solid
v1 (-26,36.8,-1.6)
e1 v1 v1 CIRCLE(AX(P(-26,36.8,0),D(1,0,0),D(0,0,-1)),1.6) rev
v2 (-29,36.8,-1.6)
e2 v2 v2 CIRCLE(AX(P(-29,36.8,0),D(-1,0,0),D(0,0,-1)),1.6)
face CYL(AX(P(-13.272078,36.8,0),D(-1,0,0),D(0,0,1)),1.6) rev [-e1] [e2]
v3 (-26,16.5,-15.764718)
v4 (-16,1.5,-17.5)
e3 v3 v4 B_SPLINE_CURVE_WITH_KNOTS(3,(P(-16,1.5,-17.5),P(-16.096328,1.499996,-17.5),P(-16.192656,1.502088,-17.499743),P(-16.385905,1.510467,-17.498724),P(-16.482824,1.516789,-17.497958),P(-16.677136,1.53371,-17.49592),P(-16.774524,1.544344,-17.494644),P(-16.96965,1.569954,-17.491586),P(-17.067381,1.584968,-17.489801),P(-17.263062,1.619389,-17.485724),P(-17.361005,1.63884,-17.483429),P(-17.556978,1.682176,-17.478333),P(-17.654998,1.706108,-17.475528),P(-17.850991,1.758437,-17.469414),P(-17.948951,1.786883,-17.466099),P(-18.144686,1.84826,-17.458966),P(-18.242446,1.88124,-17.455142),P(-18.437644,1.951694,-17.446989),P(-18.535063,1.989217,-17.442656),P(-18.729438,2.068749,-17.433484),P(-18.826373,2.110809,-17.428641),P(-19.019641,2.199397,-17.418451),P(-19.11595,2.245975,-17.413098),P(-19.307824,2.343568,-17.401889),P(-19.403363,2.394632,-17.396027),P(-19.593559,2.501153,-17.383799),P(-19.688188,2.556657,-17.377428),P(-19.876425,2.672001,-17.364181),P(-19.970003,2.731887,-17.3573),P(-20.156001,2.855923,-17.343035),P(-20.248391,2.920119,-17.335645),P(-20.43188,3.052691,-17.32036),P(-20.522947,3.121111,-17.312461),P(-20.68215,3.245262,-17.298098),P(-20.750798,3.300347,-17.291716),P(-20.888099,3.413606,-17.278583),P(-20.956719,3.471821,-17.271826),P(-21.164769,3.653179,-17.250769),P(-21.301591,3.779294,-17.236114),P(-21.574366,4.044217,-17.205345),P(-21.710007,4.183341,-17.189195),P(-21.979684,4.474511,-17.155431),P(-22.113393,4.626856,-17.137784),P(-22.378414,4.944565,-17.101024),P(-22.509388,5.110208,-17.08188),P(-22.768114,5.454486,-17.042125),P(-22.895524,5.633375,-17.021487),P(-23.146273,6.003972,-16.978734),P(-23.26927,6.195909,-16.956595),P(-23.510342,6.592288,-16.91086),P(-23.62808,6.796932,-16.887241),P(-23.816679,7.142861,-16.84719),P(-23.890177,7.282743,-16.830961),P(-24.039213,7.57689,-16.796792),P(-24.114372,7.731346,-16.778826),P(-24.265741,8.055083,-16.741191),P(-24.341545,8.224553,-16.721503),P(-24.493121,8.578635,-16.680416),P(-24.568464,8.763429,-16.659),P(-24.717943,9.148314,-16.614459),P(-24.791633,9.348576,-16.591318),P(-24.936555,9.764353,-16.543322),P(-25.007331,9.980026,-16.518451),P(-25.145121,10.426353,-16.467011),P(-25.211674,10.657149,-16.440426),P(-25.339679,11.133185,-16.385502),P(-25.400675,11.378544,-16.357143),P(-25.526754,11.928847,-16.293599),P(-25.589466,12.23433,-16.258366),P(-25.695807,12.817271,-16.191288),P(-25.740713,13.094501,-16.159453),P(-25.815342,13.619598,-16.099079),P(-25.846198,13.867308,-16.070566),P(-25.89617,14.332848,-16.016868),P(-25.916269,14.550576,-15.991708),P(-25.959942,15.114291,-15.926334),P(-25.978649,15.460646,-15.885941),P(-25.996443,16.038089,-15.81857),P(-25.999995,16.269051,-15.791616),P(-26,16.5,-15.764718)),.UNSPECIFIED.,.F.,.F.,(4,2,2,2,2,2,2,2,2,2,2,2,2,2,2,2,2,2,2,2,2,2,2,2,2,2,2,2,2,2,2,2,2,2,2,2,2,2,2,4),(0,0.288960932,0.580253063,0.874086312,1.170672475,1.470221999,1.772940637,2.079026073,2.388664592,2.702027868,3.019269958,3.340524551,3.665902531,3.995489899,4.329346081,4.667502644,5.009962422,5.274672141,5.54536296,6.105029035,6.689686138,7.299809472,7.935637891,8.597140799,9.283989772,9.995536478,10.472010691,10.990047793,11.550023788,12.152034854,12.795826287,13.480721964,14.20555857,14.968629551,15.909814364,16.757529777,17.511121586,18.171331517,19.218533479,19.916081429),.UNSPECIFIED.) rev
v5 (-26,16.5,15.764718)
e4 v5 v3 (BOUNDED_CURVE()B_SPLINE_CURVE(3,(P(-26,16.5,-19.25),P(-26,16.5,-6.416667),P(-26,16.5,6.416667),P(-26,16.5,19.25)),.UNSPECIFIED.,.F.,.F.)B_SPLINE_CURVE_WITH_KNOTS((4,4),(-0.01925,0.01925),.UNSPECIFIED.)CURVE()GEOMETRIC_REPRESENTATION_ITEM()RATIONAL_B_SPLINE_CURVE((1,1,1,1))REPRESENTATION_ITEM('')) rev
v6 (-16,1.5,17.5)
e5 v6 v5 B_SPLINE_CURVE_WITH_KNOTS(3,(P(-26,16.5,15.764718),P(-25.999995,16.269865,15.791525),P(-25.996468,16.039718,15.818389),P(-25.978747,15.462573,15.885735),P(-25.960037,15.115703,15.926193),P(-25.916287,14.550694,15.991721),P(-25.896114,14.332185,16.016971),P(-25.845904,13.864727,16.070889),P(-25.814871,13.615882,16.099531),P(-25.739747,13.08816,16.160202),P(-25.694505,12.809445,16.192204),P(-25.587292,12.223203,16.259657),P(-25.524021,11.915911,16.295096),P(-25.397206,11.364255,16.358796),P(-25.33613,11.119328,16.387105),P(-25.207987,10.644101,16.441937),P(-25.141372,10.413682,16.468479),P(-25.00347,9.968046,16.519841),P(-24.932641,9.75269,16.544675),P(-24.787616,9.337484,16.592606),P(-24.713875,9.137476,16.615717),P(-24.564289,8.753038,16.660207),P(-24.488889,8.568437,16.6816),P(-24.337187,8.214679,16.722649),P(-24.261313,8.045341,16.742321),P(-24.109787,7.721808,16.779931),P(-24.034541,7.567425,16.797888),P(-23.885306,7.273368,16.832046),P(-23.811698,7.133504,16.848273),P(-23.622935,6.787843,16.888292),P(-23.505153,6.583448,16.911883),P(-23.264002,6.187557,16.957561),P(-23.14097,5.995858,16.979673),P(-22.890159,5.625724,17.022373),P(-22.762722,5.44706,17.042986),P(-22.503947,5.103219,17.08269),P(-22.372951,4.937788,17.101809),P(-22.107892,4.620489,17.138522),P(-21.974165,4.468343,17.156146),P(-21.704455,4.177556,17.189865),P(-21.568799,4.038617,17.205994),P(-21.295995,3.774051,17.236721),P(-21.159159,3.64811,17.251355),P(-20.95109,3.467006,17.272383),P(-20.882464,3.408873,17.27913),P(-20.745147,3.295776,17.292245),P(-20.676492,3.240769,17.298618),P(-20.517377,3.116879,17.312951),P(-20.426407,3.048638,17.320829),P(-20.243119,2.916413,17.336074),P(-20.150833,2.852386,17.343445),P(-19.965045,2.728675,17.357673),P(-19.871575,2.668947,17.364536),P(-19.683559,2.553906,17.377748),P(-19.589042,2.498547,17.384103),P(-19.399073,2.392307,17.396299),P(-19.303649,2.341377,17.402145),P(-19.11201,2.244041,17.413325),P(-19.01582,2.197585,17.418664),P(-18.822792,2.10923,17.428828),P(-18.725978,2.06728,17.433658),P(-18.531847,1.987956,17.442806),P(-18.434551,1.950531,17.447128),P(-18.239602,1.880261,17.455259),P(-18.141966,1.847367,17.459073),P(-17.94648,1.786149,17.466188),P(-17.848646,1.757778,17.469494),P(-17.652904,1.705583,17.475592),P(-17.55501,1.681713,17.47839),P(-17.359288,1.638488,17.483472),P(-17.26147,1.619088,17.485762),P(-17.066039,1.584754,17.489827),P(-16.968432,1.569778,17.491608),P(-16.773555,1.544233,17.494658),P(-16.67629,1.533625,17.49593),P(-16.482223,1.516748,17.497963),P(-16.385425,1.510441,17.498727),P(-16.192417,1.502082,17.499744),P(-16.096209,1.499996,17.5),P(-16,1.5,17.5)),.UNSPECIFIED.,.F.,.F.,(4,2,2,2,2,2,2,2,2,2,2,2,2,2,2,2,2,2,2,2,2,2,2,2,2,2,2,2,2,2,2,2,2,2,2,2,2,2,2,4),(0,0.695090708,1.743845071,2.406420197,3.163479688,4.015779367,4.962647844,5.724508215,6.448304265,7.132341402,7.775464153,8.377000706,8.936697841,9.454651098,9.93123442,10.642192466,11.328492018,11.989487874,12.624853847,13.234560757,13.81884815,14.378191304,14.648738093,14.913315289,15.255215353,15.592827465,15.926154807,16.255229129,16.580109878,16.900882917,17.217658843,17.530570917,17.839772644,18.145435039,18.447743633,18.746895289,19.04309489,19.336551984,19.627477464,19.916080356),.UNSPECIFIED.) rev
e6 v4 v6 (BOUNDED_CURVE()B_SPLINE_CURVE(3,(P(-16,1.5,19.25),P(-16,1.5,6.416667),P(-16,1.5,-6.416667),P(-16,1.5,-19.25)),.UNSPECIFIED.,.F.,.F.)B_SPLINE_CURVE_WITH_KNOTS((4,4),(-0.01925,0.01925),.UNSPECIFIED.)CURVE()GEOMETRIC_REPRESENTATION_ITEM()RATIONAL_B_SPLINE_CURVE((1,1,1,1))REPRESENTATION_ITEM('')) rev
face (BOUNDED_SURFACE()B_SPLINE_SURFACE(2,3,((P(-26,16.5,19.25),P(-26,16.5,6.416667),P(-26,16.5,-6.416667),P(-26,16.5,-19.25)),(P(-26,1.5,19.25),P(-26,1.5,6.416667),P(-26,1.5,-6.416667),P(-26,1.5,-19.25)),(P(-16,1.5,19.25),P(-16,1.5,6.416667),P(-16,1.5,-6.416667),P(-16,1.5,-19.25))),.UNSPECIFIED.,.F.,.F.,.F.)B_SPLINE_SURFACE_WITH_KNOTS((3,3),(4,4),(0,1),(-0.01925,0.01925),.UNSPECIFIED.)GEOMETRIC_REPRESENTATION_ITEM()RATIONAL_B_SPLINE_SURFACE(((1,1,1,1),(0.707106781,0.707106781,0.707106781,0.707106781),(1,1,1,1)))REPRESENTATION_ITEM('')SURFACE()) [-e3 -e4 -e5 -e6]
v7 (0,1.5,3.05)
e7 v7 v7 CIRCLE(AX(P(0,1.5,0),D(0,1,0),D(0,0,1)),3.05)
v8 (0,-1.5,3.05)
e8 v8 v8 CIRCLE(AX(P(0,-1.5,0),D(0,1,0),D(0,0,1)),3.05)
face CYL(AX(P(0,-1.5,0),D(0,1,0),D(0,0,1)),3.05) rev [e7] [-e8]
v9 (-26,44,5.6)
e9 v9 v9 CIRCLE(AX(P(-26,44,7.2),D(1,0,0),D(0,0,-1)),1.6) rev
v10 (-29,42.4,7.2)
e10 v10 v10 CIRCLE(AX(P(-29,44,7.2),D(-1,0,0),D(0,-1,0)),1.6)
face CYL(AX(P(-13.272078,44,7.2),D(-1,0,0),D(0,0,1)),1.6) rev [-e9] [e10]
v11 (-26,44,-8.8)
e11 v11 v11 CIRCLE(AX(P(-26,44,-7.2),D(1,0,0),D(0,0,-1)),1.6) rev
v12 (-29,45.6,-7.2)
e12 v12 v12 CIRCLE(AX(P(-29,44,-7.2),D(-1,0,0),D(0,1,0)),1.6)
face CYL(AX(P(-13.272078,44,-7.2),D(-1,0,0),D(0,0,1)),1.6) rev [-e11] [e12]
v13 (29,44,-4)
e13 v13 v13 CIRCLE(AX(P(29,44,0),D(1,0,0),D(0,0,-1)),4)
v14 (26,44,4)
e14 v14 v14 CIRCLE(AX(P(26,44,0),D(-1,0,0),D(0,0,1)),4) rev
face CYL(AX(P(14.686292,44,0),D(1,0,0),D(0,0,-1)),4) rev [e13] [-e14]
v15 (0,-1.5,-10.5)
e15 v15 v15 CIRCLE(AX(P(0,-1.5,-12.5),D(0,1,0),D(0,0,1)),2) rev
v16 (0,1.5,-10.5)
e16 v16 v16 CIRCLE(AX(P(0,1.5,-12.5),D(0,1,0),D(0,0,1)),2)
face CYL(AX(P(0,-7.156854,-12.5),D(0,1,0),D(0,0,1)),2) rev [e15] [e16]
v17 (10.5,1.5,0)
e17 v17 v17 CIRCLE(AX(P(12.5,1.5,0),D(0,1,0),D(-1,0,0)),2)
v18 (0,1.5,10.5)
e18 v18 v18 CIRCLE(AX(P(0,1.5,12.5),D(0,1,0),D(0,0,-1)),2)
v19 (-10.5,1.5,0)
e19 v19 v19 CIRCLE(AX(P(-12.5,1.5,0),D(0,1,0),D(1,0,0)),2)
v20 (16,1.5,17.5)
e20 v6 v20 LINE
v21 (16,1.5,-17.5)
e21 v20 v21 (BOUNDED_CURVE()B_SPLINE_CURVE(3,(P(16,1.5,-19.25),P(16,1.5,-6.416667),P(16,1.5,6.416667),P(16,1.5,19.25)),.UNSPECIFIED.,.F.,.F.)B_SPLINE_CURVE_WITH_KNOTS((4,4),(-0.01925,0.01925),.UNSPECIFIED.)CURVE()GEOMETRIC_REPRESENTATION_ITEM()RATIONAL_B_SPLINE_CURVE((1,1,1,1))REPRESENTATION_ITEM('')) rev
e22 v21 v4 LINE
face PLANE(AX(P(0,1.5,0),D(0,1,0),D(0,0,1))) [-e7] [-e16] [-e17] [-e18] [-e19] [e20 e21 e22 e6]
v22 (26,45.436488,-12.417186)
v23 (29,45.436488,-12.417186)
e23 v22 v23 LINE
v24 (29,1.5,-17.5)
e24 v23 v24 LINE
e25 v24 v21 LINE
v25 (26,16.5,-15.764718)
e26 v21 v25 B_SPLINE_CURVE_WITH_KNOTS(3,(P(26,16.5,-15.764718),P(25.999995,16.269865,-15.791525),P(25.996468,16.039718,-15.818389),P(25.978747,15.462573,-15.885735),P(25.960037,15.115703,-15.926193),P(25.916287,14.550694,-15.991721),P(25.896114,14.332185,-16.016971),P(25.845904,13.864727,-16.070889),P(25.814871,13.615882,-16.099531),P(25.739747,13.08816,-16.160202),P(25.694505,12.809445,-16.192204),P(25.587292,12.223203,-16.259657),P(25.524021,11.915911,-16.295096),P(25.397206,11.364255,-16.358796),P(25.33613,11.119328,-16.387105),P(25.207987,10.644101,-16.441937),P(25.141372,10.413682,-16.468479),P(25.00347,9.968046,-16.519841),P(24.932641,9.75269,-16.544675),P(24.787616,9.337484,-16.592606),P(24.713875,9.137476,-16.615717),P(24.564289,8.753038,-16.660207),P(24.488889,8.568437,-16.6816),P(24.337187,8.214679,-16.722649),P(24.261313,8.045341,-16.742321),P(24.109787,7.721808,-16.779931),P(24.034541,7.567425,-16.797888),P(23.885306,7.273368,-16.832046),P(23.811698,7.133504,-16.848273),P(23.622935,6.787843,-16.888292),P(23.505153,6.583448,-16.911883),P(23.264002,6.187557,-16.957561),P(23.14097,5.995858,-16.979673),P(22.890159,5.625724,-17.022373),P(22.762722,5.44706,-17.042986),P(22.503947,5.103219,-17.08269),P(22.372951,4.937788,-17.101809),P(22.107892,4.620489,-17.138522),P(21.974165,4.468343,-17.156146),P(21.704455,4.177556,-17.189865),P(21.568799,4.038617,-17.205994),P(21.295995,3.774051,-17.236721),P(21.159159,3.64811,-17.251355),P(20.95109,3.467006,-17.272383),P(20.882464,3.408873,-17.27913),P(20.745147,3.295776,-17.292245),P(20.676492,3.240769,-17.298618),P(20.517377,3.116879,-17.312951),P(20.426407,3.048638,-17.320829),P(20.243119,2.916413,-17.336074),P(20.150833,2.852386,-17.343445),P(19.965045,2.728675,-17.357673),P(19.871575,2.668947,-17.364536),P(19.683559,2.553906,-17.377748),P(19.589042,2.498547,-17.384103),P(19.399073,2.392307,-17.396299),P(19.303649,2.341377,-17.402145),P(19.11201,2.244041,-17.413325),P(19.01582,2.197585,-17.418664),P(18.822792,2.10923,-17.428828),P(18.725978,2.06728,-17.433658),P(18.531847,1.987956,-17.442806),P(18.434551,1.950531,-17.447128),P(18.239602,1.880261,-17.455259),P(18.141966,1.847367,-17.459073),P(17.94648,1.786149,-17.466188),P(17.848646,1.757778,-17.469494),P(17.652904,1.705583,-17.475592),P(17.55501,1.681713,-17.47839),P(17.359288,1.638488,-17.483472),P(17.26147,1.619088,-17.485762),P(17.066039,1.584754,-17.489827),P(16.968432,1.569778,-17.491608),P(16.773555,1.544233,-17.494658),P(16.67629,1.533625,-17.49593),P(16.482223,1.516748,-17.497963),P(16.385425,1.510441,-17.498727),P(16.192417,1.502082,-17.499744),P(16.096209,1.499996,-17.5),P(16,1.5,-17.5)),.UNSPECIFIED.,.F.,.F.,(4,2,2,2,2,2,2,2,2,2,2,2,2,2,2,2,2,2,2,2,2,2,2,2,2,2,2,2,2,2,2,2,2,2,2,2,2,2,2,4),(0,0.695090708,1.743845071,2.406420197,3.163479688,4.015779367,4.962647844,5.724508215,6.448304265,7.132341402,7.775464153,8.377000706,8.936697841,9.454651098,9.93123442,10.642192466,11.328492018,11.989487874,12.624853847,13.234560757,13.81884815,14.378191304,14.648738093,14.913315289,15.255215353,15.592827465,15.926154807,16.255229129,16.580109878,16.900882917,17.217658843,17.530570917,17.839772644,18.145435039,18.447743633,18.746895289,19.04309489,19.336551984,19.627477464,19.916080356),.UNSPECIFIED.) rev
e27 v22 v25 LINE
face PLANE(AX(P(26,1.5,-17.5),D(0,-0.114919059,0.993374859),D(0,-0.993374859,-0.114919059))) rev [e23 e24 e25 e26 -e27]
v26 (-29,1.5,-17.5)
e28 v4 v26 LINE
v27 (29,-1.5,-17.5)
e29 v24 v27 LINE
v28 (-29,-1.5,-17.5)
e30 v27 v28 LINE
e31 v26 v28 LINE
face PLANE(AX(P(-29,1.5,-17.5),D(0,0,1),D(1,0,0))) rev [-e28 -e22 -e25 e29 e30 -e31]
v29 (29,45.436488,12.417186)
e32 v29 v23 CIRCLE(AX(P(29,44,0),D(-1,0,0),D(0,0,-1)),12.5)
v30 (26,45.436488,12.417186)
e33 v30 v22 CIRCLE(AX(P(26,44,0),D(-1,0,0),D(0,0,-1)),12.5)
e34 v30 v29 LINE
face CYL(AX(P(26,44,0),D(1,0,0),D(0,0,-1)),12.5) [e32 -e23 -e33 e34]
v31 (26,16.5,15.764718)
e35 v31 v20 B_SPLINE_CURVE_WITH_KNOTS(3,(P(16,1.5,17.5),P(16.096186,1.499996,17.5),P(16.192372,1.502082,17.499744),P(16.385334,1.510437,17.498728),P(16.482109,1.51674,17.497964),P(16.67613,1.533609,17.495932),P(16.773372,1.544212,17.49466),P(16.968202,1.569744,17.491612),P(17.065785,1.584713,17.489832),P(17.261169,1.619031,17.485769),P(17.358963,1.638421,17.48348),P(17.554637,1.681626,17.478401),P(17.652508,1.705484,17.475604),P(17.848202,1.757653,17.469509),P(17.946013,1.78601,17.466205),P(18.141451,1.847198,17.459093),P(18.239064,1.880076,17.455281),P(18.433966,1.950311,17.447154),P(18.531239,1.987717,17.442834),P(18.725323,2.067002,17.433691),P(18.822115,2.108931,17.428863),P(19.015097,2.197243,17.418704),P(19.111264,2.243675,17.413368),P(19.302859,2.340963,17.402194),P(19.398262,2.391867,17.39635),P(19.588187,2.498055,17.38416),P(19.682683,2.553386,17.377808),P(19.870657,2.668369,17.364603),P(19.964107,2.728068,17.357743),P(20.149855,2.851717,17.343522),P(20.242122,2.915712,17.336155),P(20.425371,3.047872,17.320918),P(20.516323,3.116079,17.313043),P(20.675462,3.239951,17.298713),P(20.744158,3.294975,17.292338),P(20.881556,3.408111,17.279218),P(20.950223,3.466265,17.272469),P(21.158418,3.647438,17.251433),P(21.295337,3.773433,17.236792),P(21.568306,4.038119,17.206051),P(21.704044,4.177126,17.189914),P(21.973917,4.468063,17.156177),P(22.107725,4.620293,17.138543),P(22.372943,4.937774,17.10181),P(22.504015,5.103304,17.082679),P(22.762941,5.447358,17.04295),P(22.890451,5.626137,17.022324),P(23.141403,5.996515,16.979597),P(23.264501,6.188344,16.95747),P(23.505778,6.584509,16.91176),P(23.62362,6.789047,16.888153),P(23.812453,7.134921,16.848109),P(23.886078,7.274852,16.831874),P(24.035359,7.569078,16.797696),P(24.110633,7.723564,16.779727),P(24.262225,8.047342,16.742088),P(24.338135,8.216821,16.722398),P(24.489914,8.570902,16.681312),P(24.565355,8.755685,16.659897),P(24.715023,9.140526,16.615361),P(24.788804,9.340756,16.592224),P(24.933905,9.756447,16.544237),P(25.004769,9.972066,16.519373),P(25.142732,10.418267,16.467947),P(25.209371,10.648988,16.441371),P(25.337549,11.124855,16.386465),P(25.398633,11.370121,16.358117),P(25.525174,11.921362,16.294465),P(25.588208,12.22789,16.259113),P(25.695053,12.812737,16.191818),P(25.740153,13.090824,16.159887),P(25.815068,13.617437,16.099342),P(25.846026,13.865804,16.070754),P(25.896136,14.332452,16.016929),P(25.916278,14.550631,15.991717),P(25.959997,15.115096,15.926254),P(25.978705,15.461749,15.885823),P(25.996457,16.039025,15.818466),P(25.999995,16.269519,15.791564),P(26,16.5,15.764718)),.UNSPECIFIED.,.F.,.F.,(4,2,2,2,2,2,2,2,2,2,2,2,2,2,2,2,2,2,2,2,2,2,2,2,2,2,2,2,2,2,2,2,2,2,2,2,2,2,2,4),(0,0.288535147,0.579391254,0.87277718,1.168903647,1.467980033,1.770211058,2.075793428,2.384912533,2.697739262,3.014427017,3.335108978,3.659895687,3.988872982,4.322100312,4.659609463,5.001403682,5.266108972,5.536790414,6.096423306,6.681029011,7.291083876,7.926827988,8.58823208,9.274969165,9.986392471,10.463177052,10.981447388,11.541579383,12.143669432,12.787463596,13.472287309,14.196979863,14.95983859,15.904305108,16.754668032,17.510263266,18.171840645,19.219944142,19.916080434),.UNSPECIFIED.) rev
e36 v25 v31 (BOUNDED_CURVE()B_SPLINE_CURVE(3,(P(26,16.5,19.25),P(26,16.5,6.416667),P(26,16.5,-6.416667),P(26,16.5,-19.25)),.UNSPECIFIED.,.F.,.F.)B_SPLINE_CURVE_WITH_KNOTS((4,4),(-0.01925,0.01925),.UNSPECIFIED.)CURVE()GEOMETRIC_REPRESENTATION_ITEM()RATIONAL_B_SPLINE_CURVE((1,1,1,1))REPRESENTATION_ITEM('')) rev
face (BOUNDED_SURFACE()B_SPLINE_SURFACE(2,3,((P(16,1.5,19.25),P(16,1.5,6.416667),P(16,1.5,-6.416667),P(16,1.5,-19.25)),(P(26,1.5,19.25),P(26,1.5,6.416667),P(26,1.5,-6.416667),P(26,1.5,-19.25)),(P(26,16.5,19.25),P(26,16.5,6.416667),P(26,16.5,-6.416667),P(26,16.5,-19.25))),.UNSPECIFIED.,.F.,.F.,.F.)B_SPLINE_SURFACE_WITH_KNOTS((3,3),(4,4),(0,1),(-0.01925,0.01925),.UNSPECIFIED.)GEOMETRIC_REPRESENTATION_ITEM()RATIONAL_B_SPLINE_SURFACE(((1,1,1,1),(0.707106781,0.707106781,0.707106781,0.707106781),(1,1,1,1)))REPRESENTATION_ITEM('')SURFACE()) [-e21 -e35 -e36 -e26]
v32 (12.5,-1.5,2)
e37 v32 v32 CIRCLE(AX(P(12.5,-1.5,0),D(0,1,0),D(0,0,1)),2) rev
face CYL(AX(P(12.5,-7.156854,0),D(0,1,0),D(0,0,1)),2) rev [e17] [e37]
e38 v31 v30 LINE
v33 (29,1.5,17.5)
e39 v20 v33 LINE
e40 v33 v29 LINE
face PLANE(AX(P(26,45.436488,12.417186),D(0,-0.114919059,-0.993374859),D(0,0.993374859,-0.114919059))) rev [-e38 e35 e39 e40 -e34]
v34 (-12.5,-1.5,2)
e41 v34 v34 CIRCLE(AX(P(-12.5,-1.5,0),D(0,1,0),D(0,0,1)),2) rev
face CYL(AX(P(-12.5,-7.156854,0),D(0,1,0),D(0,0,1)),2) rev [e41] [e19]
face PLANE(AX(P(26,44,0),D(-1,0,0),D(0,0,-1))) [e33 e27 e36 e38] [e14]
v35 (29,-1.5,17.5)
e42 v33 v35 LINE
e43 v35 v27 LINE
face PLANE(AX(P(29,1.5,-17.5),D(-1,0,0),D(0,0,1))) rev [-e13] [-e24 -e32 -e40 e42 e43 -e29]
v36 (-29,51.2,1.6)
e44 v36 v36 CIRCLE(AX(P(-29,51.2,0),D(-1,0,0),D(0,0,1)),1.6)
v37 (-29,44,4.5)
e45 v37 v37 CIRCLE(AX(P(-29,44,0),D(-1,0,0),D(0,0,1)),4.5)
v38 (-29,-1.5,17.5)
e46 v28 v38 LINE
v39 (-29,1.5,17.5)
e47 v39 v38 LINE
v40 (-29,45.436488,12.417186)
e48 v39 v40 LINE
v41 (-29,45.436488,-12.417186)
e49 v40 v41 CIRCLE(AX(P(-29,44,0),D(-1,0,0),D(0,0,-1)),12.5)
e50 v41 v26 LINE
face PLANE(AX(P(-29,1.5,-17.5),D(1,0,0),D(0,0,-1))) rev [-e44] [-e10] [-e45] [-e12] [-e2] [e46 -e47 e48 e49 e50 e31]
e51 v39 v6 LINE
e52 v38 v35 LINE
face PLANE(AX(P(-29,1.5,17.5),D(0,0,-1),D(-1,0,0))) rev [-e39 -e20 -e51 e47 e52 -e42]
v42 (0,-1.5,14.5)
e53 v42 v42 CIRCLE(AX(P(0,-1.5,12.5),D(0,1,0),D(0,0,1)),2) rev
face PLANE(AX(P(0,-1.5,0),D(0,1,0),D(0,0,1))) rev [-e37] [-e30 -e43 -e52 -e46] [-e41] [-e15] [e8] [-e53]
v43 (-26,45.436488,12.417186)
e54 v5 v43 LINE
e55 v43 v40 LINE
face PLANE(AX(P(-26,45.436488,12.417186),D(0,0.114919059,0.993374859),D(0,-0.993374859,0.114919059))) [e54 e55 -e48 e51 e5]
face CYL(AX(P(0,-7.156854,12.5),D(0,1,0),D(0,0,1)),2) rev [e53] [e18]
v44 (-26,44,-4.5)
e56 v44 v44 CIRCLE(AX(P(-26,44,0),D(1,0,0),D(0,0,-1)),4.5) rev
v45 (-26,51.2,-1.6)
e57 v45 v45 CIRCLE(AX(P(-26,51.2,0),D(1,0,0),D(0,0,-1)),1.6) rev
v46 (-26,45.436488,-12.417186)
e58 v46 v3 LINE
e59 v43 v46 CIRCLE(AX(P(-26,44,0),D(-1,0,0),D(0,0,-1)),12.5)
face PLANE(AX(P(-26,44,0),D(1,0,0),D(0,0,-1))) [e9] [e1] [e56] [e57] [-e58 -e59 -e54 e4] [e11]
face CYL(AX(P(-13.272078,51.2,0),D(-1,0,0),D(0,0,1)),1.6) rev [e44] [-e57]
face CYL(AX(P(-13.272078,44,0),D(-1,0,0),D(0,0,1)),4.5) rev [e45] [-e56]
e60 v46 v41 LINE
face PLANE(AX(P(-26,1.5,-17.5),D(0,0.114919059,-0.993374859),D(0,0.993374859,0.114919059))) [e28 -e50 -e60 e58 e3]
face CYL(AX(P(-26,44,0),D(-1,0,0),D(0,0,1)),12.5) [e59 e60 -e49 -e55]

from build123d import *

# Parameters (mm, degrees)
SKETCH1_W           = 58
SKETCH1_H           = 35
BOSS_EXTRUDE1_DEPTH = 1.5
BOSS_EXTRUDE2_DEPTH = 3
SKETCH4_R           = 4.5
SKETCH4_R_2         = 1.6
CUT_EXTRUDE1_DEPTH  = 55
CIRPATTERN1_COUNT   = 4
SKETCH5_R           = 3.05
CUT_EXTRUDE2_DEPTH  = 3
SKETCH6_R           = 2
CUT_EXTRUDE3_DEPTH  = 3
CIRPATTERN2_COUNT   = 4
FILLET1_SIZE        = 10
FILLET1_SIZE_2      = 15
SKETCH8_R           = 4
CUT_EXTRUDE4_DEPTH  = 3


with BuildPart() as part:
    # Sketch1 → Boss-Extrude1 (new, symmetric)
    with BuildSketch(Plane(origin=(0, 0, 0), x_dir=(1, 0, 0), z_dir=(0, 1, 0))):
        Rectangle(SKETCH1_W, SKETCH1_H)
    extrude(amount=BOSS_EXTRUDE1_DEPTH, both=True)

    # Sketch3 → Boss-Extrude2 (add)
    with BuildSketch(Plane.ZY.offset(29)):
        with BuildLine():
            Line((-17.5, 1.5), (-12.417185733, 45.436488243))
            ThreePointArc((-12.417185733, 45.436488243), (0, 56.5), (12.417185733, 45.436488243))
            Line((12.417185733, 45.436488243), (17.5, 1.5))
            Line((17.5, 1.5), (-17.5, 1.5))
        make_face()
    boss_extrude2 = extrude(amount=-BOSS_EXTRUDE2_DEPTH)

    # Sketch4 → Cut-Extrude1 (cut)
    with BuildSketch(Plane.ZY.offset(29)):
        with Locations((0, 44)):
            Circle(SKETCH4_R)
        with Locations((0, 51.2)):
            Circle(SKETCH4_R_2)
    cut_extrude1 = extrude(amount=-CUT_EXTRUDE1_DEPTH, mode=Mode.SUBTRACT)

    # CirPattern1: Cut-Extrude1 ×4 about axis
    cirpattern1_axis = Axis((0, 44, 0), (1, 0, 0))
    for i in range(1, CIRPATTERN1_COUNT):
        add(cut_extrude1.rotate(cirpattern1_axis, i * 360 / CIRPATTERN1_COUNT), mode=Mode.SUBTRACT)

    # Mirror1: Boss-Extrude2 across plane
    add(boss_extrude2.mirror(Plane(origin=(0, 0, 0), x_dir=(0, 0, 1), z_dir=(1, 0, 0))))

    # Sketch5 → Cut-Extrude2 (cut)
    with BuildSketch(Plane(origin=(0, 1.5, 0), x_dir=(1, 0, 0), z_dir=(0, 1, 0))):
        with Locations(Location((0, 0, 0), (0, 0, 270))):
            Circle(SKETCH5_R)
    extrude(amount=-CUT_EXTRUDE2_DEPTH, mode=Mode.SUBTRACT)

    # Sketch6 → Cut-Extrude3 (cut)
    with BuildSketch(Plane(origin=(0, 1.5, 0), x_dir=(1, 0, 0), z_dir=(0, 1, 0))):
        with Locations(Location((0, 12.5, 0), (0, 0, 270))):
            Circle(SKETCH6_R)
    cut_extrude3 = extrude(amount=-CUT_EXTRUDE3_DEPTH, mode=Mode.SUBTRACT)

    # CirPattern2: Cut-Extrude3 ×4 about axis
    cirpattern2_axis = Axis((0, 0, 0), (0, 1, 0))
    for i in range(1, CIRPATTERN2_COUNT):
        add(cut_extrude3.rotate(cirpattern2_axis, i * 360 / CIRPATTERN2_COUNT), mode=Mode.SUBTRACT)

    # Fillet1
    # an asymmetric fillet: 15, 10 mm, written as the material it adds along each edge
    with BuildSketch(Plane(origin=(-26, 1.5, 17.5), x_dir=(1, 0, 0), z_dir=(0, 0, -1))) as fillet1_piece_1_section:
        with BuildLine():
            Bezier((FILLET1_SIZE, 0), (0, 0), (0, -FILLET1_SIZE_2), weights=[1, 0.707106781, 1])
            Line((0, -FILLET1_SIZE_2), (0, 0))
            Line((0, 0), (FILLET1_SIZE, 0))
        make_face()
    fillet1_piece_1 = extrude(amount=35, mode=Mode.PRIVATE)
    fillet1_piece_1 = split(fillet1_piece_1, bisect_by=Plane(origin=(-23.803649904, 6.92315613, -16.872619514), z_dir=(0, -0.11491905943987848, 0.9933748586397049)), keep=Keep.TOP, mode=Mode.PRIVATE)
    fillet1_piece_1 = split(fillet1_piece_1, bisect_by=Plane(origin=(-23.803649904, 6.923154429, 16.872619711), z_dir=(0, -0.1149190594398785, -0.9933748586397049)), keep=Keep.TOP, mode=Mode.PRIVATE)
    add(fillet1_piece_1)
    with BuildSketch(Plane(origin=(26, 1.5, 17.5), x_dir=(-1, 0, 0), z_dir=(0, 0, -1))) as fillet1_piece_2_section:
        with BuildLine():
            Bezier((FILLET1_SIZE, 0), (0, 0), (0, FILLET1_SIZE_2), weights=[1, 0.707106781, 1])
            Line((0, FILLET1_SIZE_2), (0, 0))
            Line((0, 0), (FILLET1_SIZE, 0))
        make_face()
    fillet1_piece_2 = extrude(amount=35, mode=Mode.PRIVATE)
    fillet1_piece_2 = split(fillet1_piece_2, bisect_by=Plane(origin=(23.803649904, 6.92315613, -16.872619514), z_dir=(0, -0.11491905943987848, 0.9933748586397049)), keep=Keep.TOP, mode=Mode.PRIVATE)
    fillet1_piece_2 = split(fillet1_piece_2, bisect_by=Plane(origin=(23.803649904, 6.923154429, 16.872619711), z_dir=(0, -0.1149190594398785, -0.9933748586397049)), keep=Keep.TOP, mode=Mode.PRIVATE)
    add(fillet1_piece_2)

    # Sketch8 → Cut-Extrude4 (cut)
    with BuildSketch(Plane(origin=(29, 0, 0), x_dir=(0, 0, -1), z_dir=(1, 0, 0))):
        with Locations((0, 44)):
            Circle(SKETCH8_R)
    extrude(amount=-CUT_EXTRUDE4_DEPTH, mode=Mode.SUBTRACT)


solid = part.part
